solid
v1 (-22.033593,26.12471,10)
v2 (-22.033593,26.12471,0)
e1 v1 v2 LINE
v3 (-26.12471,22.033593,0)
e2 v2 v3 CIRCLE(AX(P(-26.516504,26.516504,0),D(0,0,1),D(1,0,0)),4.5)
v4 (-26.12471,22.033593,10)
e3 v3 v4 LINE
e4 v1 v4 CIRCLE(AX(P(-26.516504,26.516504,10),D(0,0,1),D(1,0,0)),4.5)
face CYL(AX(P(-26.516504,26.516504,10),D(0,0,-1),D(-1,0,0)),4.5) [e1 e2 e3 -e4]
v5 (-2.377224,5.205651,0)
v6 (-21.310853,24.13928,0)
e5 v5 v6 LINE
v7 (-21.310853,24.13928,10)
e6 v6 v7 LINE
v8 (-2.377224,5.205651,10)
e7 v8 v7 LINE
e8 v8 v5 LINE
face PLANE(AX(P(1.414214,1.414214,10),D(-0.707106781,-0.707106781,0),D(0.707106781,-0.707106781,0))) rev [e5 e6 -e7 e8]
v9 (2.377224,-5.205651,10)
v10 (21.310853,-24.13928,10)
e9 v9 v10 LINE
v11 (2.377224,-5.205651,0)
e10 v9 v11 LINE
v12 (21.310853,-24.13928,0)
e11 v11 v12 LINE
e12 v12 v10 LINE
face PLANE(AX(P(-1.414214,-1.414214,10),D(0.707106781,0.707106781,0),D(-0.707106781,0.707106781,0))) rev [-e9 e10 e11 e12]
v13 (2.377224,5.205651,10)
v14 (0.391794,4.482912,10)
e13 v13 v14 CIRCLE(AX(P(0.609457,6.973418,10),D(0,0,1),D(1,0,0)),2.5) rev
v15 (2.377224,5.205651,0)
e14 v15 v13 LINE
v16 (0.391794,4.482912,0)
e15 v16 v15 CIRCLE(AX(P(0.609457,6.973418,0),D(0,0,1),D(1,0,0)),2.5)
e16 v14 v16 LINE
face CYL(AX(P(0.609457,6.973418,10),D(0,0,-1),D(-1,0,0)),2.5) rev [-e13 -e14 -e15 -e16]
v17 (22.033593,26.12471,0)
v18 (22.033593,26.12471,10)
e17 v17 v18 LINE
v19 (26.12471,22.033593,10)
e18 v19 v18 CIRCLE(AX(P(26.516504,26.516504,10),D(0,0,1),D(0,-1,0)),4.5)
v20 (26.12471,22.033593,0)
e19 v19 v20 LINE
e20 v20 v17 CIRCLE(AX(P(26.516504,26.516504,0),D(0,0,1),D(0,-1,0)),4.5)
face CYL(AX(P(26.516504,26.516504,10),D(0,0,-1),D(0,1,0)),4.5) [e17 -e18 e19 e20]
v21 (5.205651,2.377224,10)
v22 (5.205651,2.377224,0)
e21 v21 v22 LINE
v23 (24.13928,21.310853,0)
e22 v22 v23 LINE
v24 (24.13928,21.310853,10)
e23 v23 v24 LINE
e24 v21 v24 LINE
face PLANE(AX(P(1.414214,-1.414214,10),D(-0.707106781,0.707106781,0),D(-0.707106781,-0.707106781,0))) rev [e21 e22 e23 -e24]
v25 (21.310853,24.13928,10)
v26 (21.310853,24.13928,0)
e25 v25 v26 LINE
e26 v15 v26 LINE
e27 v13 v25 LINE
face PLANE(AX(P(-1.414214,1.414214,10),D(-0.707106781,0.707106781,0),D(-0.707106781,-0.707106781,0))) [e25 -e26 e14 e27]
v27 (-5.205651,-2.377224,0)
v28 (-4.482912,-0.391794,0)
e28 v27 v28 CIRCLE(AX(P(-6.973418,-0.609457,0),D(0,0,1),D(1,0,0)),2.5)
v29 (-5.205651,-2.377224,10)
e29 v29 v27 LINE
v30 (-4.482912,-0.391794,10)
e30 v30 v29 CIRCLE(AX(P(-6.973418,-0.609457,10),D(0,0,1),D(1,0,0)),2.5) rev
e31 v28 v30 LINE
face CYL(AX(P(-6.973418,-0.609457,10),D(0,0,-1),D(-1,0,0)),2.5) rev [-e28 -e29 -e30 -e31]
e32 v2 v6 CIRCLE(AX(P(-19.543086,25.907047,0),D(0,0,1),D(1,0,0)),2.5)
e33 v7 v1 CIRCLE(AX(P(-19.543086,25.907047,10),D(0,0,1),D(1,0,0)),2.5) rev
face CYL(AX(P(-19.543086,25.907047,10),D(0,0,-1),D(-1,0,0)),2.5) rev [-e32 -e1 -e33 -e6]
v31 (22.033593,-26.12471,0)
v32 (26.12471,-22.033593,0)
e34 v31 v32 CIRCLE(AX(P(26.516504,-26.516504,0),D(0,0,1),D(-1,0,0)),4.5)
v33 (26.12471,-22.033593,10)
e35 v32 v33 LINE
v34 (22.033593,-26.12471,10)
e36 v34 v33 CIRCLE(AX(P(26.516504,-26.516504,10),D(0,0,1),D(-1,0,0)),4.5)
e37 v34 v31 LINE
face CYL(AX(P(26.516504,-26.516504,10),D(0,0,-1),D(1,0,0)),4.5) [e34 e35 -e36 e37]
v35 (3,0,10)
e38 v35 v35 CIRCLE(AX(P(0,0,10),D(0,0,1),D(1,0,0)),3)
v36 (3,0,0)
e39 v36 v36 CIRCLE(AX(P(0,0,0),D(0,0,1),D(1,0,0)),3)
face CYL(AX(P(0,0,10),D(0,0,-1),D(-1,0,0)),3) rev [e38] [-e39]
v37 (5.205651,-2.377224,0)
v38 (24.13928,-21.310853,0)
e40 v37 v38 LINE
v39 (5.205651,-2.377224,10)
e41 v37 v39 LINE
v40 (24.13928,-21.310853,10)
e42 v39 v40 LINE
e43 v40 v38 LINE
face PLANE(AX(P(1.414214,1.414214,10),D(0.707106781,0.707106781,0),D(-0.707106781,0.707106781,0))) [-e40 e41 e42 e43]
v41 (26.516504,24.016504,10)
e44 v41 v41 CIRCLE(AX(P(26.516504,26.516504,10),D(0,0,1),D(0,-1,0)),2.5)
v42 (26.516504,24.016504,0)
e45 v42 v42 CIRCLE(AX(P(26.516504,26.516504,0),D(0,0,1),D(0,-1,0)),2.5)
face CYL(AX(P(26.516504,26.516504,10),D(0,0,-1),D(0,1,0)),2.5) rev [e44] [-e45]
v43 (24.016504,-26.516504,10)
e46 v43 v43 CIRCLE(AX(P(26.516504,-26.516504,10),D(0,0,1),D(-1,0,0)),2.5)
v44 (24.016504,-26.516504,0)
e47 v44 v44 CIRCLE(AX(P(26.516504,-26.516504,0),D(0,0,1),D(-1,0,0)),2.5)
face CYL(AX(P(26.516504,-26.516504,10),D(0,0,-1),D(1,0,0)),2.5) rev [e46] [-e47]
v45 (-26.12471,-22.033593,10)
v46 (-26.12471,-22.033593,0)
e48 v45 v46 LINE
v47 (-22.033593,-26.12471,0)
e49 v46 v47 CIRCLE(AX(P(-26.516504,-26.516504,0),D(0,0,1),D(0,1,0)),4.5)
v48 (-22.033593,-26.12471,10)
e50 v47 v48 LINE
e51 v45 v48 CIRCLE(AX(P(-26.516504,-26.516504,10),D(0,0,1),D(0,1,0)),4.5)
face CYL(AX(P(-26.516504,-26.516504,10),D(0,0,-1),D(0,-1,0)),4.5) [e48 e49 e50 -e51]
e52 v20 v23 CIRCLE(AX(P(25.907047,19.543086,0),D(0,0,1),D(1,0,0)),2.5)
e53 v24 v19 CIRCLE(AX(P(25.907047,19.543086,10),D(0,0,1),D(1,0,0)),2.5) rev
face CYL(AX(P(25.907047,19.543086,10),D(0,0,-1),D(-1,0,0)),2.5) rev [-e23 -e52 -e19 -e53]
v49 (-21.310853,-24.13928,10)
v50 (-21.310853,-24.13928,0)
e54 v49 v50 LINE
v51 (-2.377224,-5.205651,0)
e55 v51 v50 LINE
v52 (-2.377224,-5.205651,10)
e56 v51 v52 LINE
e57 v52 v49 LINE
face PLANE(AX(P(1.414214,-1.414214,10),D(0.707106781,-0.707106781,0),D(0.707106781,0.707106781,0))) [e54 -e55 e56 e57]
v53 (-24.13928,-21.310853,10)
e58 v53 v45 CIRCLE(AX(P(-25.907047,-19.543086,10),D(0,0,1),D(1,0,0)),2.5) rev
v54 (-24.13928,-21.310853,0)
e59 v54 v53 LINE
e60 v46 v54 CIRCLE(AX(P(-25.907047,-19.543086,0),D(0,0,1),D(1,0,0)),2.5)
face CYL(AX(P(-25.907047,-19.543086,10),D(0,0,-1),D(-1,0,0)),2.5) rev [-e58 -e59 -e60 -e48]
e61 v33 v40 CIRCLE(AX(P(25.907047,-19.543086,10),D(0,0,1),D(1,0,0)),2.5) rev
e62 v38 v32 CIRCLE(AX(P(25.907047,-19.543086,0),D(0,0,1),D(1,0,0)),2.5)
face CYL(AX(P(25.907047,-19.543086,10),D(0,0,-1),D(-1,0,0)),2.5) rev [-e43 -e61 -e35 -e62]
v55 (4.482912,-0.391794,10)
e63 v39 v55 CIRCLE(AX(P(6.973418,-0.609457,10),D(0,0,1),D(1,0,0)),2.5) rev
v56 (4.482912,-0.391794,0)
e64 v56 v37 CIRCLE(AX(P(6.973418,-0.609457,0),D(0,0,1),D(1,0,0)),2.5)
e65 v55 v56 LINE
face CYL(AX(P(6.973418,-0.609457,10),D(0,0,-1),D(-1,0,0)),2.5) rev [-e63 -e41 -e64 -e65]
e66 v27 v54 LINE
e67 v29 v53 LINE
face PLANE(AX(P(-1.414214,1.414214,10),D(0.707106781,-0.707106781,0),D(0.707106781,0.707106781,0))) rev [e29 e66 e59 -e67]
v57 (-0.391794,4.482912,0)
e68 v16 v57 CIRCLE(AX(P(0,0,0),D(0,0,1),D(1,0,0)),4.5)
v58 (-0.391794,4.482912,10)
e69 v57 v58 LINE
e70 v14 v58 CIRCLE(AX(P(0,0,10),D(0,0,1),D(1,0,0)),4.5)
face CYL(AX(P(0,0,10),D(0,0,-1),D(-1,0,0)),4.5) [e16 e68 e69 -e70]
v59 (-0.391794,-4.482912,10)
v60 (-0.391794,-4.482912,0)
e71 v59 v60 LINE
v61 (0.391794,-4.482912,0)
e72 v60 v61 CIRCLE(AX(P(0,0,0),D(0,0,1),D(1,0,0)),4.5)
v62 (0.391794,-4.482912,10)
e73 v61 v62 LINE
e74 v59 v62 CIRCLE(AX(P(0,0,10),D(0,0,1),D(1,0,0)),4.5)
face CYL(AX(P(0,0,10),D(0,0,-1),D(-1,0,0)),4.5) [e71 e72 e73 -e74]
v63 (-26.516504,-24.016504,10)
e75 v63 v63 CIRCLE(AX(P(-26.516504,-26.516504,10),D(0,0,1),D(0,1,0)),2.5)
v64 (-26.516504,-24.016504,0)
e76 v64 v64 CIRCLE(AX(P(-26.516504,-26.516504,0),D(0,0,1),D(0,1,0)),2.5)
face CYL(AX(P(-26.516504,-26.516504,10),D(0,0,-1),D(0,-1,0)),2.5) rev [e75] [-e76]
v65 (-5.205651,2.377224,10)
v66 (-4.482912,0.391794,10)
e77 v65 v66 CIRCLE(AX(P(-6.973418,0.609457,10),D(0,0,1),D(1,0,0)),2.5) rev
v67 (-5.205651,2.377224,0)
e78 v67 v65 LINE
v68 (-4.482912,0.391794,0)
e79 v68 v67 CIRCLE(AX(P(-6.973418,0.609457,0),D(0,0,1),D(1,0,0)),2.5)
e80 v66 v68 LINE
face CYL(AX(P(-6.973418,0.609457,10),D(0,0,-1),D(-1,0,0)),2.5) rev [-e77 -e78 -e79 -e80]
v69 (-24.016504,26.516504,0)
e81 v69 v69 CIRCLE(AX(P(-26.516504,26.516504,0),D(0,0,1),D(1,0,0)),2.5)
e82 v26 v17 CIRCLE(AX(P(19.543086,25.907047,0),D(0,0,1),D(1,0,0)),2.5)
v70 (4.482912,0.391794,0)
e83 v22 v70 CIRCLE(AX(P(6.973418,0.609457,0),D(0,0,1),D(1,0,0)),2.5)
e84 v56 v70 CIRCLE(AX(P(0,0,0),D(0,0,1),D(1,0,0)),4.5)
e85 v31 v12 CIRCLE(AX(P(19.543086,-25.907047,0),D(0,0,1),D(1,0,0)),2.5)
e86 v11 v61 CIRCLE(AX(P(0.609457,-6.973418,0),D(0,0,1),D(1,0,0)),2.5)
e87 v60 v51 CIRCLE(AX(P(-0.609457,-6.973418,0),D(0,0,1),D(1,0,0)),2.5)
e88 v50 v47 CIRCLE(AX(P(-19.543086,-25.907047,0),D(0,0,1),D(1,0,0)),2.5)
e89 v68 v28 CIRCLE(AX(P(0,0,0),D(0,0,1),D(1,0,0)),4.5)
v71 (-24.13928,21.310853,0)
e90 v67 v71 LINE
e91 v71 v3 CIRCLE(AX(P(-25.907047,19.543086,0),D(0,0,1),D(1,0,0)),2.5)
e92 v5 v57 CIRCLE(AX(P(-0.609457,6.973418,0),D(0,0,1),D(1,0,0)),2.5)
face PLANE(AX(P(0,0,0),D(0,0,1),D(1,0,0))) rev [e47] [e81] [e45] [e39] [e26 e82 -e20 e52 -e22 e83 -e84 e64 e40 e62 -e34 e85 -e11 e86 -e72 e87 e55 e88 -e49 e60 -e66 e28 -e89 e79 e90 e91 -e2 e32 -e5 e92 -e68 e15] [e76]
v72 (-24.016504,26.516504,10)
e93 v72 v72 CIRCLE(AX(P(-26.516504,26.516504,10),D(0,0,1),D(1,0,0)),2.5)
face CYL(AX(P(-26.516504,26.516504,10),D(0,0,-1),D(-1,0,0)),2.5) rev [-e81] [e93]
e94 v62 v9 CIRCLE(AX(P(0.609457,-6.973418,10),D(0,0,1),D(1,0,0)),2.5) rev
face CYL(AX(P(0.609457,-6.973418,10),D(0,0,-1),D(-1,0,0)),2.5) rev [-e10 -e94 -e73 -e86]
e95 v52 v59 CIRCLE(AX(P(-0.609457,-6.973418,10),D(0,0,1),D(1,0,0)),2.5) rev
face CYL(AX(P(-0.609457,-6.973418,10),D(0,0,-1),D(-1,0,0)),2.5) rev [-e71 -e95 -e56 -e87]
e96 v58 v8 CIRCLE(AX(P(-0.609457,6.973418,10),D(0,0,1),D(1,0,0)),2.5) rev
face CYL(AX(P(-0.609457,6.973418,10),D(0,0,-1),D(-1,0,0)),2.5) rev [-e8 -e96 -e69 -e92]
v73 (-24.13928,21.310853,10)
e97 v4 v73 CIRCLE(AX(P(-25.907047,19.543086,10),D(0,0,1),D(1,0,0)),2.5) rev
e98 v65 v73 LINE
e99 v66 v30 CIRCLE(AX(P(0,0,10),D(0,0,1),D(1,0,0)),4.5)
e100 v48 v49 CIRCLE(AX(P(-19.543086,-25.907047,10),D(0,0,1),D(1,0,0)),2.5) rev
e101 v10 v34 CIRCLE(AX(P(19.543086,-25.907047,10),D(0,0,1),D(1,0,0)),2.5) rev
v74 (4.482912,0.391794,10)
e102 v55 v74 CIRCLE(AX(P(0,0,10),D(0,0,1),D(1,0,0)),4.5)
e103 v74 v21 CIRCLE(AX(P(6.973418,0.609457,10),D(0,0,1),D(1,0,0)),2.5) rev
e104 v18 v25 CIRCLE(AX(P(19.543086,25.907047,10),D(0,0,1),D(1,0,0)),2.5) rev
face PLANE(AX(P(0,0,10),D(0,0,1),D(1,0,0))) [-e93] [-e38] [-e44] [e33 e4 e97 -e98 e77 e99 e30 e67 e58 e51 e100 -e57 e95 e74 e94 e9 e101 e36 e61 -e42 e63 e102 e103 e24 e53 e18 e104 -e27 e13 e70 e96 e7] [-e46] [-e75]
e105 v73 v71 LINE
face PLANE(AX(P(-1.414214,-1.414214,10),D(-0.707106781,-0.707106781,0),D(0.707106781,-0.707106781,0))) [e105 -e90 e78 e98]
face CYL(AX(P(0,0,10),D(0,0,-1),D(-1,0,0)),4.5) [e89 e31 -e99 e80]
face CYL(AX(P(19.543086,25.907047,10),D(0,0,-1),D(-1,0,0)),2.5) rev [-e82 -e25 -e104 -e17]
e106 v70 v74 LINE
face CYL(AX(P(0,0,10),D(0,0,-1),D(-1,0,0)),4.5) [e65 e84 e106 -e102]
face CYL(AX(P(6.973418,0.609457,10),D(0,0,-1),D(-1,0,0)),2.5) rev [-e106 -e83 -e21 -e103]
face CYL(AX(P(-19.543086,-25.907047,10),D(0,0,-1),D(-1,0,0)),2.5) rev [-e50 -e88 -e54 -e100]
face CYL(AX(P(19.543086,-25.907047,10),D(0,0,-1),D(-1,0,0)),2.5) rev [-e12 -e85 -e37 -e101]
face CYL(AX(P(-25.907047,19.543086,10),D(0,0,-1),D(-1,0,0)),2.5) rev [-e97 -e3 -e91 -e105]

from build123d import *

# Parameters (mm, degrees)
BOSS_EXTRUDE1_DEPTH = 10
CIRPATTERN1_COUNT   = 4
FILLET1_R           = 2.5


with BuildPart() as part:
    # Sketch1 → Boss-Extrude1 (new body)
    with BuildSketch(Plane.XY):
        with BuildLine():
            ThreePointArc((-25.080279294, 22.251852169), (-23.334523779, 23.334523779), (-22.251852169, 25.080279294))
            Line((-22.251852169, 25.080279294), (-24.04163056, 26.870057685))
            ThreePointArc((-24.04163056, 26.870057685), (-24.022793772, 26.693726845), (-24.016504294, 26.516504294))
            ThreePointArc((-24.016504294, 26.516504294), (-24.878499941, 24.627869407), (-26.870057685, 24.04163056))
            Line((-26.870057685, 24.04163056), (-25.080279294, 22.251852169))
        make_face()
        with BuildLine():
            Line((-24.04163056, 26.870057685), (-22.251852169, 25.080279294))
            ThreePointArc((-22.251852169, 25.080279294), (-22.075731019, 25.788814307), (-22.016504294, 26.516504294))
            ThreePointArc((-22.016504294, 26.516504294), (-30.171159716, 29.142050666), (-25.080279294, 22.251852169))
            Line((-25.080279294, 22.251852169), (-26.870057685, 24.04163056))
            ThreePointArc((-26.870057685, 24.04163056), (-28.284271247, 28.284271247), (-24.04163056, 26.870057685))
        make_face()
        with BuildLine():
            ThreePointArc((-4.264652125, 1.436225), (-3.181980515, 3.181980515), (-1.436225, 4.264652125))
            Line((-1.436225, 4.264652125), (-22.251852169, 25.080279294))
            ThreePointArc((-22.251852169, 25.080279294), (-23.334523779, 23.334523779), (-25.080279294, 22.251852169))
            Line((-25.080279294, 22.251852169), (-4.264652125, 1.436225))
        make_face()
        with BuildLine():
            ThreePointArc((-2.995352392, 0.166925268), (-2.121320344, 2.121320344), (-0.166925268, 2.995352392))
            Line((-0.166925268, 2.995352392), (-1.436225, 4.264652125))
            ThreePointArc((-1.436225, 4.264652125), (-3.181980515, 3.181980515), (-4.264652125, 1.436225))
            Line((-4.264652125, 1.436225), (-2.995352392, 0.166925268))
        make_face()
        with BuildLine():
            Line((-1.436225, 4.264652125), (-0.166925268, 2.995352392))
            ThreePointArc((-0.166925268, 2.995352392), (2.061458731, 2.179538461), (3, 0))
            ThreePointArc((3, 0), (-0.083494978, -2.998837873), (-2.995352392, 0.166925268))
            Line((-2.995352392, 0.166925268), (-4.264652125, 1.436225))
            ThreePointArc((-4.264652125, 1.436225), (-0.727689988, -4.440773275), (4.5, 0))
            ThreePointArc((4.5, 0), (2.625546372, 3.654655422), (-1.436225, 4.264652125))
        make_face()
    extrude(amount=BOSS_EXTRUDE1_DEPTH)


with BuildPart() as cirpattern1_1:
    # CirPattern1: pattern copy
    add(part.part.rotate(Axis((0, 0, 0), (0, 0, 1)), 1 * 360 / CIRPATTERN1_COUNT))


with BuildPart() as cirpattern1_2:
    # CirPattern1: pattern copy
    add(part.part.rotate(Axis((0, 0, 0), (0, 0, 1)), 2 * 360 / CIRPATTERN1_COUNT))


with BuildPart() as cirpattern1_3:
    # CirPattern1: pattern copy
    add(part.part.rotate(Axis((0, 0, 0), (0, 0, 1)), 3 * 360 / CIRPATTERN1_COUNT))

    # Combine1: read off the stored shape, not the designer's step
    # Combine1: union CirPattern1_2, CirPattern1_1, part
    add(cirpattern1_2.part)
    add(cirpattern1_1.part)
    add(part.part)

    # Fillet1
    fillet1_edges = [cirpattern1_3.edges().sort_by_distance(p)[0] for p in [
        (-4.264652125, 1.436225, 5),
        (-25.080279294, 22.251852169, 5),
        (-22.251852169, 25.080279294, 5),
        (-1.436225, 4.264652125, 5),
        (-1.436225, -4.264652125, 5),
        (1.436225, 4.264652125, 5),
        (4.264652125, -1.436225, 5),
        (4.264652125, 1.436225, 5),
        (25.080279294, 22.251852169, 5),
        (22.251852169, 25.080279294, 5),
        (22.251852169, -25.080279294, 5),
        (25.080279294, -22.251852169, 5),
        (1.436225, -4.264652125, 5),
        (-4.264652125, -1.436225, 5),
        (-25.080279294, -22.251852169, 5),
        (-22.251852169, -25.080279294, 5),
    ]]
    fillet(fillet1_edges, radius=FILLET1_R)


solid = cirpattern1_3.part
